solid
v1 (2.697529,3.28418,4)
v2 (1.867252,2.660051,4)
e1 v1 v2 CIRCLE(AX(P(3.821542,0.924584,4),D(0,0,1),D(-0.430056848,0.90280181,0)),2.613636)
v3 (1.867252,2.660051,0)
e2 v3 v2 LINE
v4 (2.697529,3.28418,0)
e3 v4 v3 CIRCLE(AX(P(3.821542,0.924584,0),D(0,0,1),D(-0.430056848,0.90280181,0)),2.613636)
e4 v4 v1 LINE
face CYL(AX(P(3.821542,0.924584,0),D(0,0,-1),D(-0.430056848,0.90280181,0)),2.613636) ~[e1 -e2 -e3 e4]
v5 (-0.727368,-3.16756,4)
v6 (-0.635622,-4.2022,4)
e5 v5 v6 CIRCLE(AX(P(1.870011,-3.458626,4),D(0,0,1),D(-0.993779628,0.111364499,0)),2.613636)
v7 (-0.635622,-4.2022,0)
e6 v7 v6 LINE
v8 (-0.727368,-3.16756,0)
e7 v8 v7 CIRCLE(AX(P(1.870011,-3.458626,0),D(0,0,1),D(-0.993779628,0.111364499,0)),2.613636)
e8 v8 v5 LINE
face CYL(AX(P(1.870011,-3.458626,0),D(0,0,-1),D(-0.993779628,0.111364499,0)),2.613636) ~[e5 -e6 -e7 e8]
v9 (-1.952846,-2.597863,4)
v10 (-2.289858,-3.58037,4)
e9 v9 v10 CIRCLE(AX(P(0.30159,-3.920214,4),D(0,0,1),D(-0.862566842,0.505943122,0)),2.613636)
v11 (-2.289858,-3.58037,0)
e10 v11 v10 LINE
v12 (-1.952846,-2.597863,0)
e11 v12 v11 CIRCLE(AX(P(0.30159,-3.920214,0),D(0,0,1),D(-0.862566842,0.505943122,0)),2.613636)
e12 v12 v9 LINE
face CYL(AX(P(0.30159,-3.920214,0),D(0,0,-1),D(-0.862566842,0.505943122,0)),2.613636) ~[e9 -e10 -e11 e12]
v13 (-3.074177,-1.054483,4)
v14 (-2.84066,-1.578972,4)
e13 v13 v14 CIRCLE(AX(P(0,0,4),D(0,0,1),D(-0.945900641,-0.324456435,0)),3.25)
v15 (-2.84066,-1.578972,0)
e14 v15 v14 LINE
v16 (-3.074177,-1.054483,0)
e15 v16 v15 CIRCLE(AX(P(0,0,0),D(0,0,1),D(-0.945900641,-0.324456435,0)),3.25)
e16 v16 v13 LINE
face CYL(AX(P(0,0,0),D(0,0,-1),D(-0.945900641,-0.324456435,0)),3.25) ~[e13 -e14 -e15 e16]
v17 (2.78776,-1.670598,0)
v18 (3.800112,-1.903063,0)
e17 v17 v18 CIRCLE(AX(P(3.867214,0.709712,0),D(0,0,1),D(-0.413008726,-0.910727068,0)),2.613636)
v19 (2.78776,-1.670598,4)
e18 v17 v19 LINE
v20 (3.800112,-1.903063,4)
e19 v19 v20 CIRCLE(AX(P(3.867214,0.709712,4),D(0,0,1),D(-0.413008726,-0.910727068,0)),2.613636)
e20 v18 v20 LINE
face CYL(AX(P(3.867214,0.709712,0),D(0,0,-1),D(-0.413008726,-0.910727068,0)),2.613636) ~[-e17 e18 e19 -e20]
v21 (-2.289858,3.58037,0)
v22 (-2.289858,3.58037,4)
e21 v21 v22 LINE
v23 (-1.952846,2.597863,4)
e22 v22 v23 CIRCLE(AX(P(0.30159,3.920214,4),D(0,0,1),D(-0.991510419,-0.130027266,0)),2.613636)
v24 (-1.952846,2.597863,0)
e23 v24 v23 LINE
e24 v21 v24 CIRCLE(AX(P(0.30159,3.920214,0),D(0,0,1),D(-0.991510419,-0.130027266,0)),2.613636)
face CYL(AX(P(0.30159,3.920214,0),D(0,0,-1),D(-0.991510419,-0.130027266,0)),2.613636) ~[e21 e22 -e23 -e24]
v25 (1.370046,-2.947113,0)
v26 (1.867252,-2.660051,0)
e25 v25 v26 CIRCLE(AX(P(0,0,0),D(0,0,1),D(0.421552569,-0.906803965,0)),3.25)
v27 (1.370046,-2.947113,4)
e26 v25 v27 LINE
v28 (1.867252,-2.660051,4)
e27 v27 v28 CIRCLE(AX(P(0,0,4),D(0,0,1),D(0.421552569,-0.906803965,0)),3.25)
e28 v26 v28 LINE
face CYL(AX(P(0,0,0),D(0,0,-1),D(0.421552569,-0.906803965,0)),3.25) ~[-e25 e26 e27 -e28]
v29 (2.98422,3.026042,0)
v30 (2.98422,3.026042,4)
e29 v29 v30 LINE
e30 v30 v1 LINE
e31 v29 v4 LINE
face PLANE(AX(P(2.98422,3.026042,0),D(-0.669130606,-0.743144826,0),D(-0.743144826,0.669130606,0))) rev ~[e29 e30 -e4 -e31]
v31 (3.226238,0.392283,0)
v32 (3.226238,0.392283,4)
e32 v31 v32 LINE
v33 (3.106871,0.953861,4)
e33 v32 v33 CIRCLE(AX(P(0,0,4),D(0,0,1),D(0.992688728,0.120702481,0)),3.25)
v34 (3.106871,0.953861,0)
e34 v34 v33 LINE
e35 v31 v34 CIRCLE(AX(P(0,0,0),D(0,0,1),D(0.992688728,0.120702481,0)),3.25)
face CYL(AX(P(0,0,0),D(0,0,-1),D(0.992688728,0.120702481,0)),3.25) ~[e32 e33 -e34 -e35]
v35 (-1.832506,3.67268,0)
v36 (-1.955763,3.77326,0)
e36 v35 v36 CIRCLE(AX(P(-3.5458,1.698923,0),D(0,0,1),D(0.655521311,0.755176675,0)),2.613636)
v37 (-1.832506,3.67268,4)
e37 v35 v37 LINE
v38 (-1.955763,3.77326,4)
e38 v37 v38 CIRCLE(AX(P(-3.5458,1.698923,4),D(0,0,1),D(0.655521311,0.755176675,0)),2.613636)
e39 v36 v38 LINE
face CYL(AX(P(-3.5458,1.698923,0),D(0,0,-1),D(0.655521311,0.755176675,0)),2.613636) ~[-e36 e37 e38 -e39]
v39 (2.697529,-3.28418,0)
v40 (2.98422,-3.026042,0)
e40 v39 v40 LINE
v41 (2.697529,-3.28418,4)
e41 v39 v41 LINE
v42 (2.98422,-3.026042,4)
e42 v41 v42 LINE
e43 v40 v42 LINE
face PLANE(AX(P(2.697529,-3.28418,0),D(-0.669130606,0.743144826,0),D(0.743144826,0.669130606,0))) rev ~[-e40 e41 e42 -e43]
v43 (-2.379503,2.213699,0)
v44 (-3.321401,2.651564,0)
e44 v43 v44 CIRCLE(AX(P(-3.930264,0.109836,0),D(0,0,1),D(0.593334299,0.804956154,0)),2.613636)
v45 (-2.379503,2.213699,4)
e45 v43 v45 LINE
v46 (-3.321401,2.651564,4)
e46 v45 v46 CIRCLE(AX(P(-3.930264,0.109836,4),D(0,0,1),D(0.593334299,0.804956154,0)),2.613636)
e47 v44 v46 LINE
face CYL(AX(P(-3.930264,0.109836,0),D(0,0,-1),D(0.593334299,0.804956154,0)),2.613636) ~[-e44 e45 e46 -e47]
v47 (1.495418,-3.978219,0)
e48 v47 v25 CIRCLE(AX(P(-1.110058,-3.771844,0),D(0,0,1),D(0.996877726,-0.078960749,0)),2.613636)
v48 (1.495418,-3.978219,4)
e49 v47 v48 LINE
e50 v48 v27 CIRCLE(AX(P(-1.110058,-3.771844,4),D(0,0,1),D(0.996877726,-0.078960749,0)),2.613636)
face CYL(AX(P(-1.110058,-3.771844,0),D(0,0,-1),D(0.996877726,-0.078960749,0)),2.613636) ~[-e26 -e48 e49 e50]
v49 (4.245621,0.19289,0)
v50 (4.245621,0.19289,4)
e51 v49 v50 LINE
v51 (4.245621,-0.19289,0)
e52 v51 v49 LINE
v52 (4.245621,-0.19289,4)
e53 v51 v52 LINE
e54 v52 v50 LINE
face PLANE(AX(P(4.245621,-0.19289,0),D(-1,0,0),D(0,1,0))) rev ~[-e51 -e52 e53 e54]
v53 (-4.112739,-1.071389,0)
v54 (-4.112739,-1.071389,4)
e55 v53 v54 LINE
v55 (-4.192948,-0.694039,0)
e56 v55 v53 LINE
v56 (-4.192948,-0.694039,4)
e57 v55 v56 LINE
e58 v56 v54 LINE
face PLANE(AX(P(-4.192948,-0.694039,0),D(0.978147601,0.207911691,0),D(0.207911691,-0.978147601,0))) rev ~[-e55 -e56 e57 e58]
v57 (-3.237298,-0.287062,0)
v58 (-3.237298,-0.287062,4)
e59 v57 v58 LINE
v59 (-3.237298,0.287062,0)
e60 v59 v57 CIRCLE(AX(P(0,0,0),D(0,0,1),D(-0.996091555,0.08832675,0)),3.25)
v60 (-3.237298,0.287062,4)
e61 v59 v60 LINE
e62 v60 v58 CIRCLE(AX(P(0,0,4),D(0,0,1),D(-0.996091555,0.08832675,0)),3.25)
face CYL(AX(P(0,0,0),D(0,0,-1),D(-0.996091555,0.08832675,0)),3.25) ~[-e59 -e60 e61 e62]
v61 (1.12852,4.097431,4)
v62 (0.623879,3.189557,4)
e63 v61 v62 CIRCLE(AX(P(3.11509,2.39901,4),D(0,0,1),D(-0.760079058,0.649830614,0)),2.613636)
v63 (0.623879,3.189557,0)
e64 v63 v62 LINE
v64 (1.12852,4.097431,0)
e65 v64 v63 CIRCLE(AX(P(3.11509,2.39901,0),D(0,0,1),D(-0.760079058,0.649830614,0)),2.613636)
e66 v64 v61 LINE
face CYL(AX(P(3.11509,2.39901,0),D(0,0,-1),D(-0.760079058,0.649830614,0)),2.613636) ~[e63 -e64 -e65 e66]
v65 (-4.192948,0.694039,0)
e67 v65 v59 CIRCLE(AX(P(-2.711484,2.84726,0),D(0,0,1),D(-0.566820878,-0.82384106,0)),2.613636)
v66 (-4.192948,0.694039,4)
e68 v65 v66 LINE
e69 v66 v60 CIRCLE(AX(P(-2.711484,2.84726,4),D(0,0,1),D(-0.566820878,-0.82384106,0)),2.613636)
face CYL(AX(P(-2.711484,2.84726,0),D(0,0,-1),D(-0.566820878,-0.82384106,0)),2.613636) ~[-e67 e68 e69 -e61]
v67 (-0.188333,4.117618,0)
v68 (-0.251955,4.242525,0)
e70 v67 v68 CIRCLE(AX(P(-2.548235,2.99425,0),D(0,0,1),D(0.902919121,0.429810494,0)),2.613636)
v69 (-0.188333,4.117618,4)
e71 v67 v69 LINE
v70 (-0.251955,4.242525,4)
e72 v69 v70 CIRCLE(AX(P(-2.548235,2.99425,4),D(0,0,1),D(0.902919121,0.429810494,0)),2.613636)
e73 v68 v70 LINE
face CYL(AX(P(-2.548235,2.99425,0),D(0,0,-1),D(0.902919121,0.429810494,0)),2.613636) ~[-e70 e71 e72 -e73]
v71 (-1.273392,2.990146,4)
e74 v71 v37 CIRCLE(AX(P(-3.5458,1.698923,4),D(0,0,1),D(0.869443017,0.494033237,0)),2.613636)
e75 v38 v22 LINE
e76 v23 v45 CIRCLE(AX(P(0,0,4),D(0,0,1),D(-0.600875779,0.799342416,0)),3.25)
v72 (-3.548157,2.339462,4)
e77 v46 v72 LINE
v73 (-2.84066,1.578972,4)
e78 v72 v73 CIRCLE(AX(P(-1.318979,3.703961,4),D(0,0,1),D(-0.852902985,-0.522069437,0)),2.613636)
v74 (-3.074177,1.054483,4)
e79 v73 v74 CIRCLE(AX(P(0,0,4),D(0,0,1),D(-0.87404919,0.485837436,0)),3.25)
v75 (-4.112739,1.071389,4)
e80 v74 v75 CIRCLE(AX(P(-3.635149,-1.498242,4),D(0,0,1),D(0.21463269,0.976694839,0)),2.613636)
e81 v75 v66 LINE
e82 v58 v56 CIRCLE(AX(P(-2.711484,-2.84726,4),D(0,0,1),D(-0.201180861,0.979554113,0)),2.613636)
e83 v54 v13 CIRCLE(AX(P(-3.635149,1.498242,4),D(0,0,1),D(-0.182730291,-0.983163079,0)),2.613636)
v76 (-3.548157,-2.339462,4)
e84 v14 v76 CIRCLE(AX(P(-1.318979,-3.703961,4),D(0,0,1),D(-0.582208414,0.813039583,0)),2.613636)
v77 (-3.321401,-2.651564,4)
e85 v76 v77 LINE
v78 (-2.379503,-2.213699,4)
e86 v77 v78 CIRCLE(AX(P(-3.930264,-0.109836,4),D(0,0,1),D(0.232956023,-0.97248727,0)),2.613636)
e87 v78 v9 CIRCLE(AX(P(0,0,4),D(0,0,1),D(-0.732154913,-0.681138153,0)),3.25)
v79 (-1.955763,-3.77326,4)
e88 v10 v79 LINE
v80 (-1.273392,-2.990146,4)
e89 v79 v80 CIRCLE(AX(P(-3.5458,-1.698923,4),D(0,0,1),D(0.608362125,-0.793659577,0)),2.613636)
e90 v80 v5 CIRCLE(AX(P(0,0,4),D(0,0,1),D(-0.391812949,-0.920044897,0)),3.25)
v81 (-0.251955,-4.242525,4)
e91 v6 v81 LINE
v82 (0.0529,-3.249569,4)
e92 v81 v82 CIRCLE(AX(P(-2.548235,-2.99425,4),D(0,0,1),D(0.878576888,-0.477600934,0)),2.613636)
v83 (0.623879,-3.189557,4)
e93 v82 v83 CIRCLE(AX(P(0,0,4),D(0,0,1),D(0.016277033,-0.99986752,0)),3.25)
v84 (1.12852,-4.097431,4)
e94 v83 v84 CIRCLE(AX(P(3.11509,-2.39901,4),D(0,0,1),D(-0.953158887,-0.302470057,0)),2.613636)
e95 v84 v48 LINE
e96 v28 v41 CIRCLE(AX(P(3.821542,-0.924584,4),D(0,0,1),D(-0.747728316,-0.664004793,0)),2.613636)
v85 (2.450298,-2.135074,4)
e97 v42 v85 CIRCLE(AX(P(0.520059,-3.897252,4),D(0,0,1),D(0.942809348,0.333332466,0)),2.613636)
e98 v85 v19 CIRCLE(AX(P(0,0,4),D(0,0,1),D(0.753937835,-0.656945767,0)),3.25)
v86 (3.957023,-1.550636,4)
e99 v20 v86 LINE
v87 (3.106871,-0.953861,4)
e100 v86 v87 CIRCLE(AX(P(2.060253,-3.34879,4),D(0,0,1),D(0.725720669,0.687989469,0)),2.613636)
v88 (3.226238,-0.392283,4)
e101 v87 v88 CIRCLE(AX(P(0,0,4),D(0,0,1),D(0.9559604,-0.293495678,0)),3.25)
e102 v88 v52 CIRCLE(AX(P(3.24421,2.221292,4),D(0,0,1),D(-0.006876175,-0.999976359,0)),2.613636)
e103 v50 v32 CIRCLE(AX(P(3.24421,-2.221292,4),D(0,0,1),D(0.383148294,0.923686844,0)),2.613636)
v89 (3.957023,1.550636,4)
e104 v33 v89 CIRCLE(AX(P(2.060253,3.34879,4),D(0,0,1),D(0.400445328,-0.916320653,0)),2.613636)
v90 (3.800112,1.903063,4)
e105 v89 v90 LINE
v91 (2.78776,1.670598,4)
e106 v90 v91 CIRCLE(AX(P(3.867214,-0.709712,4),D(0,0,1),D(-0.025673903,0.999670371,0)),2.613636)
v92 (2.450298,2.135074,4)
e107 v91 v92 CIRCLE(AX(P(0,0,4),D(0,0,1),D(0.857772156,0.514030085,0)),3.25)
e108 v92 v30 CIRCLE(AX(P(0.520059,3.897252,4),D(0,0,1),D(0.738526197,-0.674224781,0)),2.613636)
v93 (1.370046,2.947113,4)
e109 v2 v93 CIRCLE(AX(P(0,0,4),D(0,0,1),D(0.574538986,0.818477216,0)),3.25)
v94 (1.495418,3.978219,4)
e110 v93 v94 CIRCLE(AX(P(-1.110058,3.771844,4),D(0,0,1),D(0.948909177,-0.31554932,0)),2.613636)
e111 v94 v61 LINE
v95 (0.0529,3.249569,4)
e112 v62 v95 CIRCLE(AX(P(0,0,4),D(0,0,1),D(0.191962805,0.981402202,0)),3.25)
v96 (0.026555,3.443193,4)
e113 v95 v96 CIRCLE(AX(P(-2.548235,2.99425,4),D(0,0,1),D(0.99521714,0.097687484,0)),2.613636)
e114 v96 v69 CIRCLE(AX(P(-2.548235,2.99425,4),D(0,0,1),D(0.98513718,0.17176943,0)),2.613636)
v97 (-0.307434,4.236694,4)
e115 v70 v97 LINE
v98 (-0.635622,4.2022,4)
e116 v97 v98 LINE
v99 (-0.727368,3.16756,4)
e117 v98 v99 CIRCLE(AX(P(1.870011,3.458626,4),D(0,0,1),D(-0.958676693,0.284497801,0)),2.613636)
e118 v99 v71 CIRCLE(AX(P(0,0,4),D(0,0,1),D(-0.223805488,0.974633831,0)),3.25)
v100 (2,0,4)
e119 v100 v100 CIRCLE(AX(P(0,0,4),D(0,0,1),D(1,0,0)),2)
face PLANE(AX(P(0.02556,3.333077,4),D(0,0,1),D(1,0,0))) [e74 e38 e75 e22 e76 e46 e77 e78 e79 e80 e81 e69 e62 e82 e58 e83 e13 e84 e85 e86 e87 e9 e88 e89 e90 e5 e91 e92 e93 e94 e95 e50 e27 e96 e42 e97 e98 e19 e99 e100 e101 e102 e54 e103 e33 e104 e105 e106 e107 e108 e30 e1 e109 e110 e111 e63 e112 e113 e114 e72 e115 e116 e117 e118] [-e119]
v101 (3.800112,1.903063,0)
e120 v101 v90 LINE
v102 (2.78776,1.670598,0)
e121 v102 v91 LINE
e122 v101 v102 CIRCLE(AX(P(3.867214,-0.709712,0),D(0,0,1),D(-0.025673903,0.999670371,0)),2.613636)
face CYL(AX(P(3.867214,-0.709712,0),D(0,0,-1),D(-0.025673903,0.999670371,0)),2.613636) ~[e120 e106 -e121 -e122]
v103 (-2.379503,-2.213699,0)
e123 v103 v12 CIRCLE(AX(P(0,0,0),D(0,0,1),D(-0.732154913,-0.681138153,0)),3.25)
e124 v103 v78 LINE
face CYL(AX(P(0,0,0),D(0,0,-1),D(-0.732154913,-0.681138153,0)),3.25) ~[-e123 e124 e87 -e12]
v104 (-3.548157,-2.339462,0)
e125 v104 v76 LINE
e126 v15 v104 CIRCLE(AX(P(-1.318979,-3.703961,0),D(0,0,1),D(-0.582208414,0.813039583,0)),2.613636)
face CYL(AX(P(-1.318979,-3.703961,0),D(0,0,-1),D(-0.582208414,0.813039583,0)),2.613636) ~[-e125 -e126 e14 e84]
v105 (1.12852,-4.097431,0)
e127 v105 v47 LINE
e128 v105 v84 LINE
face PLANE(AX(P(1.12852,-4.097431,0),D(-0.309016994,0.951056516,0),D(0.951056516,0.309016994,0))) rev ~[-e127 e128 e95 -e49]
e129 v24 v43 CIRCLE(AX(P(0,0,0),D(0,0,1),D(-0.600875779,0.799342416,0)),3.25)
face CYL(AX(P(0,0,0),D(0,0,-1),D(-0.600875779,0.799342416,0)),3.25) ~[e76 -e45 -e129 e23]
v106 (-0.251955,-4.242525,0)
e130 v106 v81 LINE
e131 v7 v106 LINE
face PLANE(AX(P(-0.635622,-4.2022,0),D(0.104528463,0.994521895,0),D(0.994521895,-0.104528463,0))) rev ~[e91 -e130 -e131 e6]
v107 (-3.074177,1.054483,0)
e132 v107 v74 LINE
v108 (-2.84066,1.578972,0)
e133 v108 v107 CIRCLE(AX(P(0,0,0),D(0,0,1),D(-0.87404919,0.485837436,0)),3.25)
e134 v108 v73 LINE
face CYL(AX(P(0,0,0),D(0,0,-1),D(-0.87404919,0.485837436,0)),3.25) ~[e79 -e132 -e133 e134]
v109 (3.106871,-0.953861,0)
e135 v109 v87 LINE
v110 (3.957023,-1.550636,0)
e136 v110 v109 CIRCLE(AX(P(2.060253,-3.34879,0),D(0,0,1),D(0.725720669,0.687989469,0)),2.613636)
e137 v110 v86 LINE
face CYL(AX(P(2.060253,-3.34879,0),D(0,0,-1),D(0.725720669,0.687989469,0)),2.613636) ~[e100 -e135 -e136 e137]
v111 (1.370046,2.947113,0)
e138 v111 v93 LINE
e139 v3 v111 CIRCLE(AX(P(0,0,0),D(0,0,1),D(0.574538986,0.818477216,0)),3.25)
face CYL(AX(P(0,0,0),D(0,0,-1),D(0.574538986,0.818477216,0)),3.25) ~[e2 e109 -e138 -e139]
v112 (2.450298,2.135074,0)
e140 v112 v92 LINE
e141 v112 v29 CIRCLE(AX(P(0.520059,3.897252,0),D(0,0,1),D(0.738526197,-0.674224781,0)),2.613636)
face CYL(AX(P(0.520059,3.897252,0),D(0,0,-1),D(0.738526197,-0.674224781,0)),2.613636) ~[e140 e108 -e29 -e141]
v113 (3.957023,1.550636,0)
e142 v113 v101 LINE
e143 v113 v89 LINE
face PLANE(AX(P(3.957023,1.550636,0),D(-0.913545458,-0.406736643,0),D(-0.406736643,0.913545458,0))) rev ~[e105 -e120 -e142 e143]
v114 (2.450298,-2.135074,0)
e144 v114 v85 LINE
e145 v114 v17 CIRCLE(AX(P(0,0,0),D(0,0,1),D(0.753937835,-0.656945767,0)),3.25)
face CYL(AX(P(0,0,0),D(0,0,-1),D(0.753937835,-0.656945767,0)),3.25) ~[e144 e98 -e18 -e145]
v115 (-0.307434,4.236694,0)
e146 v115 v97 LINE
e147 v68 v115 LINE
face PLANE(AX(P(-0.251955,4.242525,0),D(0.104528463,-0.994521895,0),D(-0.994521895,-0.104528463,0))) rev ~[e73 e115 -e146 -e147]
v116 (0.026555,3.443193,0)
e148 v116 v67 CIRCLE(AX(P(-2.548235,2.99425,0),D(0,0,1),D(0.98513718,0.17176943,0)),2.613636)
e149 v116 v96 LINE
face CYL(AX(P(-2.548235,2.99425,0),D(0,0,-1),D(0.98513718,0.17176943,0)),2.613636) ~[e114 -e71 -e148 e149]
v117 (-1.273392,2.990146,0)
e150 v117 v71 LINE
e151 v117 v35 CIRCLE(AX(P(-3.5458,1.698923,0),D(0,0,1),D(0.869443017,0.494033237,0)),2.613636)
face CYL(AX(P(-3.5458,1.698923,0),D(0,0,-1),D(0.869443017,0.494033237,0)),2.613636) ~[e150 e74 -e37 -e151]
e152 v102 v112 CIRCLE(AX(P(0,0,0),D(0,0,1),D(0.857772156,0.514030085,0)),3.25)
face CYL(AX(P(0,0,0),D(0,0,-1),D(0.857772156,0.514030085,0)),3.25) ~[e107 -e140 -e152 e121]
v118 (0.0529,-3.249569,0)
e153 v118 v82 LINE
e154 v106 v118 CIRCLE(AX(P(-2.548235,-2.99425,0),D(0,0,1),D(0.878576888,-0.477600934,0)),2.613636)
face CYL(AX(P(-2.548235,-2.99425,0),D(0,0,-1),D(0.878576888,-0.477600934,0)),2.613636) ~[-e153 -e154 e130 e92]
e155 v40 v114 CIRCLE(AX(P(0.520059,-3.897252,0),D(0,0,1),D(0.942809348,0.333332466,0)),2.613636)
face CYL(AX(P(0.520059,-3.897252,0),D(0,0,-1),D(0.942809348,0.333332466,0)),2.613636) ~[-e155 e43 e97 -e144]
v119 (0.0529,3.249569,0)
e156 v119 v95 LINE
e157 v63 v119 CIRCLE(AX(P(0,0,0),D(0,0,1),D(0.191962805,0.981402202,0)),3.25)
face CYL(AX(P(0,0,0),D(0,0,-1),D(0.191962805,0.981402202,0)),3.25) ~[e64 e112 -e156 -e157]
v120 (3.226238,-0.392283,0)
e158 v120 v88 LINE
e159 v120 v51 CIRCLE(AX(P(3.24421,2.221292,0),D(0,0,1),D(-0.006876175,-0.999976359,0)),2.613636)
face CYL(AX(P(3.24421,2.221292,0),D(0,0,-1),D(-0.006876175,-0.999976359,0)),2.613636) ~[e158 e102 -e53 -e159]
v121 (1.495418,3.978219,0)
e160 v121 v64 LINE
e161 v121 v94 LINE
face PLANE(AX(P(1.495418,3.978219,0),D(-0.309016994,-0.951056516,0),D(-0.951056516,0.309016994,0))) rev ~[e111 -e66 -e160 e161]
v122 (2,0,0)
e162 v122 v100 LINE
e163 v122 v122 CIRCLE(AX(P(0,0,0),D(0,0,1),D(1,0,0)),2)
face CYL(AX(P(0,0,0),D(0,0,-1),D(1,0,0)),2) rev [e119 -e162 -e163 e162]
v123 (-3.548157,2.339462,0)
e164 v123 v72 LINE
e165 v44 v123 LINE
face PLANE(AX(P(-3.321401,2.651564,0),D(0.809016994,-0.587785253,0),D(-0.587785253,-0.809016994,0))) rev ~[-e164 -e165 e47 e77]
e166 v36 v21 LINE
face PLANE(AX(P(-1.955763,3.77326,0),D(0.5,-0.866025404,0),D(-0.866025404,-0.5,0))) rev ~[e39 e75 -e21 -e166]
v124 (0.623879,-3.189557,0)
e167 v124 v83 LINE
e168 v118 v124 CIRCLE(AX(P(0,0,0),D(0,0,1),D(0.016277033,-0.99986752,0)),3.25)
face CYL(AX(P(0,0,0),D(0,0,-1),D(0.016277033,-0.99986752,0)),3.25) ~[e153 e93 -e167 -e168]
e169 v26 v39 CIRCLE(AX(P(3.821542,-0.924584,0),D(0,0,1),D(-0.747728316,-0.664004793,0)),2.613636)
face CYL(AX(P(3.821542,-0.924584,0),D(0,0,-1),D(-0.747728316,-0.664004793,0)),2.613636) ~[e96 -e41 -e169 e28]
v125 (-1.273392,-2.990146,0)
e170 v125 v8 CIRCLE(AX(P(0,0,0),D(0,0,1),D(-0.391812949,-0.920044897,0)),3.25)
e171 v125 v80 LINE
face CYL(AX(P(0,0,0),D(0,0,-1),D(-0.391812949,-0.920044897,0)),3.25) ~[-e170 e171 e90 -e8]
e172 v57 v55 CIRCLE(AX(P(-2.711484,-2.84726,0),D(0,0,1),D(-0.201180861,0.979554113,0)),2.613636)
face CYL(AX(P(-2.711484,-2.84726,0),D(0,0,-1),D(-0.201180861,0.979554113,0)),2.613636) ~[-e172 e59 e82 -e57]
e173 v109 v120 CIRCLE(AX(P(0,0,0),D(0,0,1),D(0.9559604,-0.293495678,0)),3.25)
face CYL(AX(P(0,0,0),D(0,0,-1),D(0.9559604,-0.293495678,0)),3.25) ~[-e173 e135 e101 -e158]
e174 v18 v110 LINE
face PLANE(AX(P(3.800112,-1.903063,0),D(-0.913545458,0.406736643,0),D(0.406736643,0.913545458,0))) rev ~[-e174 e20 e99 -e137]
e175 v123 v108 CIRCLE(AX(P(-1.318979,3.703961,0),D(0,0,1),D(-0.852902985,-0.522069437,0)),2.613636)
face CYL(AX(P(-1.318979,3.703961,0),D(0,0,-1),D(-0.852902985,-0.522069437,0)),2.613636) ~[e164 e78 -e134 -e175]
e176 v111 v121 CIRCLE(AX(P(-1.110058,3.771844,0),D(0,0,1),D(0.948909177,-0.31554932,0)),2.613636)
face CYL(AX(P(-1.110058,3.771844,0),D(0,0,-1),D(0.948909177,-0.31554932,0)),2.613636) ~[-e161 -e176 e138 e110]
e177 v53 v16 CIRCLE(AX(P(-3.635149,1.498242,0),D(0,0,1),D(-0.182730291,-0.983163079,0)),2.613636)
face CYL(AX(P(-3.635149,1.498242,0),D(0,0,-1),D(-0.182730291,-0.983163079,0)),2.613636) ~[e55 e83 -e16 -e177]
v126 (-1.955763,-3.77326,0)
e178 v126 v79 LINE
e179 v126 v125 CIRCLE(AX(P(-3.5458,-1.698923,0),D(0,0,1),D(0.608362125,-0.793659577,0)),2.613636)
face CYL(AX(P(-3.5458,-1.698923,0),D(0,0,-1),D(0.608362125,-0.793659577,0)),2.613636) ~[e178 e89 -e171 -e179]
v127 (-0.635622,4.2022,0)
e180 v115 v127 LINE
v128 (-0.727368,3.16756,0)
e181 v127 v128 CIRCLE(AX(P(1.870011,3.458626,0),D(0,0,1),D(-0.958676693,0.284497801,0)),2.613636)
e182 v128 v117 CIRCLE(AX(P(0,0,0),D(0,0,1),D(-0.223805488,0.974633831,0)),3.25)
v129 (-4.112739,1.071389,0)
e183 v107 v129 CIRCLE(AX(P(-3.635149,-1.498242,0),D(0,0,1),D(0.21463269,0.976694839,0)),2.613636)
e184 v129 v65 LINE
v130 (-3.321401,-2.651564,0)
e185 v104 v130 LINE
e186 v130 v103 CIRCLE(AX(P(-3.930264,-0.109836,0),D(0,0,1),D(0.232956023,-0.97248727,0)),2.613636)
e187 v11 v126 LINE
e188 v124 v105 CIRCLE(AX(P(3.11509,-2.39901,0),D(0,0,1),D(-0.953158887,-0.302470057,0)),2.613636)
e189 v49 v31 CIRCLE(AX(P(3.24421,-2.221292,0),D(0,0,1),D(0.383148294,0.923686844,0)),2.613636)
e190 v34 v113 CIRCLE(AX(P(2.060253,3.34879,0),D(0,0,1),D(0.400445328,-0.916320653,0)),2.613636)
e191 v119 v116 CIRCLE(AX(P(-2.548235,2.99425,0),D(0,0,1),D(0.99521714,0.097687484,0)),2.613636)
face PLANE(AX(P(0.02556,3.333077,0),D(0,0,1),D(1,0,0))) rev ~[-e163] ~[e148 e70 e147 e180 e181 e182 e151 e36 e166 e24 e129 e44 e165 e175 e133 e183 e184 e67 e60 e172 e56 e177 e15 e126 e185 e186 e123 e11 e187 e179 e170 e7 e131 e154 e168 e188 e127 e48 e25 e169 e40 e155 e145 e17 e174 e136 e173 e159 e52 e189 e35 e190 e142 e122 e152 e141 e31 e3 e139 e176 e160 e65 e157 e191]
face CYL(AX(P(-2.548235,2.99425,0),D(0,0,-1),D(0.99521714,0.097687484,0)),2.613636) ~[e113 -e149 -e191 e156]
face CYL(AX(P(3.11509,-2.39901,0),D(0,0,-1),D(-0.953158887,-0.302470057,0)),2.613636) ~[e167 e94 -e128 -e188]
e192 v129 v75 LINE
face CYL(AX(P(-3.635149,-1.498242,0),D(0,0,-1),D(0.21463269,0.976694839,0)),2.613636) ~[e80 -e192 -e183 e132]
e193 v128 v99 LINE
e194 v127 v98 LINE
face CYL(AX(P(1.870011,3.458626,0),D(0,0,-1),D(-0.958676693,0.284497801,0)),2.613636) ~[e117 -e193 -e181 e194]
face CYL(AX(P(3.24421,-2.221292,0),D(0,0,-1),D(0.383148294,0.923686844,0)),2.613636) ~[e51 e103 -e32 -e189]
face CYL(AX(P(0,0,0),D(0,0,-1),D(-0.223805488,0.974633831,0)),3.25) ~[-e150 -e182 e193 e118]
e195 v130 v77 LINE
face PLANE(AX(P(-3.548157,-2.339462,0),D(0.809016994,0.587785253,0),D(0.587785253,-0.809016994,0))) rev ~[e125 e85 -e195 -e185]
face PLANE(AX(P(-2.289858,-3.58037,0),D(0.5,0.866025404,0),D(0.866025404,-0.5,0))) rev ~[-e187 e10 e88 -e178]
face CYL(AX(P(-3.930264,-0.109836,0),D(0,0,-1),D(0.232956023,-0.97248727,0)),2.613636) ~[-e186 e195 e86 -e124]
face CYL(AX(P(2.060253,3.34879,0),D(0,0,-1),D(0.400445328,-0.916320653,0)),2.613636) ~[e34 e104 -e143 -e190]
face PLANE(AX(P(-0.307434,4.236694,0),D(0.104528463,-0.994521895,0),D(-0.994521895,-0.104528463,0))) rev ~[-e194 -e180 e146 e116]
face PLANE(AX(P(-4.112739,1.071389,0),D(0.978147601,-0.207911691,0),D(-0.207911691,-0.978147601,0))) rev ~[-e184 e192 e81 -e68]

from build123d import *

# Parameters (mm, degrees)
F1_R     = 2
F2_DEPTH = 4


# Not quite as in the source:
# - a feature names something its author has since deleted; it is built from what else it names


with BuildPart() as f2:
    # F1 (on Top) → F2 (new body)
    with BuildSketch(Plane.XY):
        with BuildLine():
            ThreePointArc((-0.009331824, 3.2499866026), (0.0217852654, 3.2499269841), (0.0529003577, 3.249569441))
            ThreePointArc((0.0529003577, 3.249569441), (0.0415378352, 3.3466273722), (0.0265550076, 3.4431927066))
            ThreePointArc((0.0265550076, 3.4431927066), (0.0136878461, 3.345646772), (-0.009331824, 3.2499866026))
        make_face()
        with BuildLine():
            ThreePointArc((-0.7273678349, 3.1675599494), (-0.3706482634, 3.2287954201), (-0.009331824, 3.2499866026))
            ThreePointArc((-0.009331824, 3.2499866026), (0.0136878461, 3.345646772), (0.0265550076, 3.4431927066))
            ThreePointArc((0.0265550076, 3.4431927066), (-0.0579521884, 3.7877136915), (-0.1883330995, 4.1176182129))
            ThreePointArc((-0.1883330995, 4.1176182129), (-0.2452042442, 4.1798359688), (-0.3074340323, 4.2366939473))
            Line((-0.3074340323, 4.2366939473), (-0.6356215278, 4.2022000516))
            ThreePointArc((-0.6356215278, 4.2022000516), (-0.733410077, 3.6894835779), (-0.7273678349, 3.1675599494))
        make_face()
        with BuildLine():
            ThreePointArc((-0.3074340323, 4.2366939473), (-0.2452042442, 4.1798359688), (-0.1883330995, 4.1176182129))
            ThreePointArc((-0.1883330995, 4.1176182129), (-0.219306435, 4.1804982316), (-0.2519548455, 4.2425250448))
            Line((-0.2519548455, 4.2425250448), (-0.3074340323, 4.2366939473))
        make_face()
        with BuildLine():
            ThreePointArc((3.2262383665, -0.392283064), (3.2440541527, -0.1965010289), (3.25, 0))
            ThreePointArc((3.25, 0), (3.2440541527, 0.1965010289), (3.2262383665, 0.392283064))
            ThreePointArc((3.2262383665, 0.392283064), (3.1789797024, 0.6757129952), (3.1068713016, 0.9538609518))
            ThreePointArc((3.1068713016, 0.9538609518), (2.9690227373, 1.32189409), (2.7877595085, 1.6705977742))
            ThreePointArc((2.7877595085, 1.6705977742), (2.6293052317, 1.91030207), (2.4502979636, 2.1350737434))
            ThreePointArc((2.4502979636, 2.1350737434), (2.1746744707, 2.4152206828), (1.8672517054, 2.6600509523))
            ThreePointArc((1.8672517054, 2.6600509523), (1.625, 2.8145825623), (1.3700458474, 2.9471128883))
            ThreePointArc((1.3700458474, 2.9471128883), (1.0043052317, 3.090933678), (0.623879119, 3.189557155))
            ThreePointArc((0.623879119, 3.189557155), (0.3397175056, 3.2321961599), (0.0529003577, 3.249569441))
            ThreePointArc((0.0529003577, 3.249569441), (0.0217852654, 3.2499269841), (-0.009331824, 3.2499866026))
            ThreePointArc((-0.009331824, 3.2499866026), (-0.673671928, 2.6091227037), (-1.565226307, 2.8482567665))
            ThreePointArc((-1.565226307, 2.8482567665), (-1.7634860259, 2.7299481747), (-1.9528462821, 2.5978628521))
            ThreePointArc((-1.9528462821, 2.5978628521), (-2.1746744707, 2.4152206828), (-2.3795034667, 2.2136989976))
            ThreePointArc((-2.3795034667, 2.2136989976), (-2.6293052317, 1.91030207), (-2.8406598662, 1.5789716669))
            ThreePointArc((-2.8406598662, 1.5789716669), (-2.9690227373, 1.32189409), (-3.0741770825, 1.0544834116))
            ThreePointArc((-3.0741770825, 1.0544834116), (-3.1789797024, 0.6757129952), (-3.2372975527, 0.287061936))
            ThreePointArc((-3.2372975527, 0.287061936), (-3.25, 0), (-3.2372975527, -0.287061936))
            ThreePointArc((-3.2372975527, -0.287061936), (-3.1789797024, -0.6757129952), (-3.0741770825, -1.0544834116))
            ThreePointArc((-3.0741770825, -1.0544834116), (-2.9690227373, -1.32189409), (-2.8406598662, -1.5789716669))
            ThreePointArc((-2.8406598662, -1.5789716669), (-2.6293052317, -1.91030207), (-2.3795034667, -2.2136989976))
            ThreePointArc((-2.3795034667, -2.2136989976), (-2.1746744707, -2.4152206828), (-1.9528462821, -2.5978628521))
            ThreePointArc((-1.9528462821, -2.5978628521), (-1.625, -2.8145825623), (-1.2733920844, -2.9901459161))
            ThreePointArc((-1.2733920844, -2.9901459161), (-1.0043052317, -3.090933678), (-0.7273678349, -3.1675599494))
            ThreePointArc((-0.7273678349, -3.1675599494), (-0.3397175056, -3.2321961599), (0.0529003577, -3.249569441))
            ThreePointArc((0.0529003577, -3.249569441), (0.3397175056, -3.2321961599), (0.623879119, -3.189557155))
            ThreePointArc((0.623879119, -3.189557155), (1.0043052317, -3.090933678), (1.3700458474, -2.9471128883))
            ThreePointArc((1.3700458474, -2.9471128883), (1.625, -2.8145825623), (1.8672517054, -2.6600509523))
            ThreePointArc((1.8672517054, -2.6600509523), (2.1746744707, -2.4152206828), (2.4502979636, -2.1350737434))
            ThreePointArc((2.4502979636, -2.1350737434), (2.6293052317, -1.91030207), (2.7877595085, -1.6705977742))
            ThreePointArc((2.7877595085, -1.6705977742), (2.9690227373, -1.32189409), (3.1068713016, -0.9538609518))
            ThreePointArc((3.1068713016, -0.9538609518), (3.1789797024, -0.6757129952), (3.2262383665, -0.392283064))
        make_face()
        Circle(F1_R, mode=Mode.SUBTRACT)
        with BuildLine():
            ThreePointArc((-1.8325056355, 3.6726799025), (-1.7998502093, 3.2277290794), (-1.565226307, 2.8482567665))
            ThreePointArc((-1.565226307, 2.8482567665), (-1.4210811819, 2.9228459204), (-1.2733920844, 2.9901459161))
            ThreePointArc((-1.2733920844, 2.9901459161), (-1.5239397604, 3.3551763863), (-1.8325056355, 3.6726799025))
        make_face()
        with BuildLine():
            ThreePointArc((-1.9528462821, 2.5978628521), (-1.7634860259, 2.7299481747), (-1.565226307, 2.8482567665))
            ThreePointArc((-1.565226307, 2.8482567665), (-1.7998502093, 3.2277290794), (-1.8325056355, 3.6726799025))
            ThreePointArc((-1.8325056355, 3.6726799025), (-1.893368674, 3.7239080781), (-1.9557625995, 3.7732602156))
            Line((-1.9557625995, 3.7732602156), (-2.289857902, 3.5803702027))
            ThreePointArc((-2.289857902, 3.5803702027), (-2.1706516096, 3.0722062109), (-1.9528462821, 2.5978628521))
        make_face()
        with BuildLine():
            ThreePointArc((-2.8406598662, 1.5789716669), (-2.6293052317, 1.91030207), (-2.3795034667, 2.2136989976))
            ThreePointArc((-2.3795034667, 2.2136989976), (-2.8284814668, 2.4798935471), (-3.3214012325, 2.651564416))
            Line((-3.3214012325, 2.651564416), (-3.5481570423, 2.3394618192))
            ThreePointArc((-3.5481570423, 2.3394618192), (-3.2325677592, 1.9237164799), (-2.8406598662, 1.5789716669))
        make_face()
        with BuildLine():
            ThreePointArc((-3.2372975527, 0.287061936), (-3.1789797024, 0.6757129952), (-3.0741770825, 1.0544834116))
            ThreePointArc((-3.0741770825, 1.0544834116), (-3.5926099725, 1.1150484286), (-4.1127394185, 1.0713890403))
            Line((-4.1127394185, 1.0713890403), (-4.1929475959, 0.6940392338))
            ThreePointArc((-4.1929475959, 0.6940392338), (-3.7355435762, 0.4425986931), (-3.2372975527, 0.287061936))
        make_face()
        with BuildLine():
            ThreePointArc((-4.1127394185, -1.0713890403), (-3.5926099725, -1.1150484286), (-3.0741770825, -1.0544834116))
            ThreePointArc((-3.0741770825, -1.0544834116), (-3.1789797024, -0.6757129952), (-3.2372975527, -0.287061936))
            ThreePointArc((-3.2372975527, -0.287061936), (-3.7355435762, -0.4425986931), (-4.1929475959, -0.6940392338))
            Line((-4.1929475959, -0.6940392338), (-4.1127394185, -1.0713890403))
        make_face()
        with BuildLine():
            ThreePointArc((-3.3214012325, -2.651564416), (-2.8284814668, -2.4798935471), (-2.3795034667, -2.2136989976))
            ThreePointArc((-2.3795034667, -2.2136989976), (-2.6293052317, -1.91030207), (-2.8406598662, -1.5789716669))
            ThreePointArc((-2.8406598662, -1.5789716669), (-3.2325677592, -1.9237164799), (-3.5481570423, -2.3394618192))
            Line((-3.5481570423, -2.3394618192), (-3.3214012325, -2.651564416))
        make_face()
        with BuildLine():
            ThreePointArc((-1.9557625995, -3.7732602156), (-1.5752828195, -3.4159425422), (-1.2733920844, -2.9901459161))
            ThreePointArc((-1.2733920844, -2.9901459161), (-1.625, -2.8145825623), (-1.9528462821, -2.5978628521))
            ThreePointArc((-1.9528462821, -2.5978628521), (-2.1706516096, -3.0722062109), (-2.289857902, -3.5803702027))
            Line((-2.289857902, -3.5803702027), (-1.9557625995, -3.7732602156))
        make_face()
        with BuildLine():
            ThreePointArc((-0.2519548455, -4.2425250448), (-0.0497034617, -3.7613440389), (0.0529003577, -3.249569441))
            ThreePointArc((0.0529003577, -3.249569441), (-0.3397175056, -3.2321961599), (-0.7273678349, -3.1675599494))
            ThreePointArc((-0.7273678349, -3.1675599494), (-0.733410077, -3.6894835779), (-0.6356215278, -4.2022000516))
            Line((-0.6356215278, -4.2022000516), (-0.2519548455, -4.2425250448))
        make_face()
        with BuildLine():
            ThreePointArc((1.4954181903, -3.9782187517), (1.4844700761, -3.4563749805), (1.3700458474, -2.9471128883))
            ThreePointArc((1.3700458474, -2.9471128883), (1.0043052317, -3.090933678), (0.623879119, -3.189557155))
            ThreePointArc((0.623879119, -3.189557155), (0.8306447207, -3.6688157164), (1.128519583, -4.0974313357))
            Line((1.128519583, -4.0974313357), (1.4954181903, -3.9782187517))
        make_face()
        with BuildLine():
            ThreePointArc((2.9842198355, -3.0260422954), (2.7619652518, -2.5537672878), (2.4502979636, -2.1350737434))
            ThreePointArc((2.4502979636, -2.1350737434), (2.1746744707, -2.4152206828), (1.8672517054, -2.6600509523))
            ThreePointArc((1.8672517054, -2.6600509523), (2.2510735, -3.0137762873), (2.6975294056, -3.2841795179))
            Line((2.6975294056, -3.2841795179), (2.9842198355, -3.0260422954))
        make_face()
        with BuildLine():
            ThreePointArc((3.9570227603, -1.5506356355), (3.5618915438, -1.2095900308), (3.1068713016, -0.9538609518))
            ThreePointArc((3.1068713016, -0.9538609518), (2.9690227373, -1.32189409), (2.7877595085, -1.6705977742))
            ThreePointArc((2.7877595085, -1.6705977742), (3.2822712209, -1.8376275589), (3.8001118877, -1.9030632256))
            Line((3.8001118877, -1.9030632256), (3.9570227603, -1.5506356355))
        make_face()
        with BuildLine():
            ThreePointArc((3.2262383665, 0.392283064), (3.2440541527, 0.1965010289), (3.25, 0))
            ThreePointArc((3.25, 0), (3.2440541527, -0.1965010289), (3.2262383665, -0.392283064))
            ThreePointArc((3.2262383665, -0.392283064), (3.7459344291, -0.3437363313), (4.2456205015, -0.1928900128))
            Line((4.2456205015, -0.1928900128), (4.2456205015, 0.1928900128))
            ThreePointArc((4.2456205015, 0.1928900128), (3.7459344291, 0.3437363313), (3.2262383665, 0.392283064))
        make_face()
        with BuildLine():
            ThreePointArc((2.7877595085, 1.6705977742), (2.9690227373, 1.32189409), (3.1068713016, 0.9538609518))
            ThreePointArc((3.1068713016, 0.9538609518), (3.5618915438, 1.2095900308), (3.9570227603, 1.5506356355))
            Line((3.9570227603, 1.5506356355), (3.8001118877, 1.9030632256))
            ThreePointArc((3.8001118877, 1.9030632256), (3.2822712209, 1.8376275589), (2.7877595085, 1.6705977742))
        make_face()
        with BuildLine():
            ThreePointArc((1.8672517054, 2.6600509523), (2.1746744707, 2.4152206828), (2.4502979636, 2.1350737434))
            ThreePointArc((2.4502979636, 2.1350737434), (2.7619652518, 2.5537672878), (2.9842198355, 3.0260422954))
            Line((2.9842198355, 3.0260422954), (2.6975294056, 3.2841795179))
            ThreePointArc((2.6975294056, 3.2841795179), (2.2510735, 3.0137762873), (1.8672517054, 2.6600509523))
        make_face()
        with BuildLine():
            ThreePointArc((0.623879119, 3.189557155), (1.0043052317, 3.090933678), (1.3700458474, 2.9471128883))
            ThreePointArc((1.3700458474, 2.9471128883), (1.4844700761, 3.4563749805), (1.4954181903, 3.9782187517))
            Line((1.4954181903, 3.9782187517), (1.128519583, 4.0974313357))
            ThreePointArc((1.128519583, 4.0974313357), (0.8306447207, 3.6688157164), (0.623879119, 3.189557155))
        make_face()
        with BuildLine():
            ThreePointArc((-1.565226307, 2.8482567665), (-0.673671928, 2.6091227037), (-0.009331824, 3.2499866026))
            ThreePointArc((-0.009331824, 3.2499866026), (-0.3706482634, 3.2287954201), (-0.7273678349, 3.1675599494))
            ThreePointArc((-0.7273678349, 3.1675599494), (-1.0043052317, 3.090933678), (-1.2733920844, 2.9901459161))
            ThreePointArc((-1.2733920844, 2.9901459161), (-1.4210811819, 2.9228459204), (-1.565226307, 2.8482567665))
        make_face()
    extrude(amount=F2_DEPTH)


solid = f2.part
